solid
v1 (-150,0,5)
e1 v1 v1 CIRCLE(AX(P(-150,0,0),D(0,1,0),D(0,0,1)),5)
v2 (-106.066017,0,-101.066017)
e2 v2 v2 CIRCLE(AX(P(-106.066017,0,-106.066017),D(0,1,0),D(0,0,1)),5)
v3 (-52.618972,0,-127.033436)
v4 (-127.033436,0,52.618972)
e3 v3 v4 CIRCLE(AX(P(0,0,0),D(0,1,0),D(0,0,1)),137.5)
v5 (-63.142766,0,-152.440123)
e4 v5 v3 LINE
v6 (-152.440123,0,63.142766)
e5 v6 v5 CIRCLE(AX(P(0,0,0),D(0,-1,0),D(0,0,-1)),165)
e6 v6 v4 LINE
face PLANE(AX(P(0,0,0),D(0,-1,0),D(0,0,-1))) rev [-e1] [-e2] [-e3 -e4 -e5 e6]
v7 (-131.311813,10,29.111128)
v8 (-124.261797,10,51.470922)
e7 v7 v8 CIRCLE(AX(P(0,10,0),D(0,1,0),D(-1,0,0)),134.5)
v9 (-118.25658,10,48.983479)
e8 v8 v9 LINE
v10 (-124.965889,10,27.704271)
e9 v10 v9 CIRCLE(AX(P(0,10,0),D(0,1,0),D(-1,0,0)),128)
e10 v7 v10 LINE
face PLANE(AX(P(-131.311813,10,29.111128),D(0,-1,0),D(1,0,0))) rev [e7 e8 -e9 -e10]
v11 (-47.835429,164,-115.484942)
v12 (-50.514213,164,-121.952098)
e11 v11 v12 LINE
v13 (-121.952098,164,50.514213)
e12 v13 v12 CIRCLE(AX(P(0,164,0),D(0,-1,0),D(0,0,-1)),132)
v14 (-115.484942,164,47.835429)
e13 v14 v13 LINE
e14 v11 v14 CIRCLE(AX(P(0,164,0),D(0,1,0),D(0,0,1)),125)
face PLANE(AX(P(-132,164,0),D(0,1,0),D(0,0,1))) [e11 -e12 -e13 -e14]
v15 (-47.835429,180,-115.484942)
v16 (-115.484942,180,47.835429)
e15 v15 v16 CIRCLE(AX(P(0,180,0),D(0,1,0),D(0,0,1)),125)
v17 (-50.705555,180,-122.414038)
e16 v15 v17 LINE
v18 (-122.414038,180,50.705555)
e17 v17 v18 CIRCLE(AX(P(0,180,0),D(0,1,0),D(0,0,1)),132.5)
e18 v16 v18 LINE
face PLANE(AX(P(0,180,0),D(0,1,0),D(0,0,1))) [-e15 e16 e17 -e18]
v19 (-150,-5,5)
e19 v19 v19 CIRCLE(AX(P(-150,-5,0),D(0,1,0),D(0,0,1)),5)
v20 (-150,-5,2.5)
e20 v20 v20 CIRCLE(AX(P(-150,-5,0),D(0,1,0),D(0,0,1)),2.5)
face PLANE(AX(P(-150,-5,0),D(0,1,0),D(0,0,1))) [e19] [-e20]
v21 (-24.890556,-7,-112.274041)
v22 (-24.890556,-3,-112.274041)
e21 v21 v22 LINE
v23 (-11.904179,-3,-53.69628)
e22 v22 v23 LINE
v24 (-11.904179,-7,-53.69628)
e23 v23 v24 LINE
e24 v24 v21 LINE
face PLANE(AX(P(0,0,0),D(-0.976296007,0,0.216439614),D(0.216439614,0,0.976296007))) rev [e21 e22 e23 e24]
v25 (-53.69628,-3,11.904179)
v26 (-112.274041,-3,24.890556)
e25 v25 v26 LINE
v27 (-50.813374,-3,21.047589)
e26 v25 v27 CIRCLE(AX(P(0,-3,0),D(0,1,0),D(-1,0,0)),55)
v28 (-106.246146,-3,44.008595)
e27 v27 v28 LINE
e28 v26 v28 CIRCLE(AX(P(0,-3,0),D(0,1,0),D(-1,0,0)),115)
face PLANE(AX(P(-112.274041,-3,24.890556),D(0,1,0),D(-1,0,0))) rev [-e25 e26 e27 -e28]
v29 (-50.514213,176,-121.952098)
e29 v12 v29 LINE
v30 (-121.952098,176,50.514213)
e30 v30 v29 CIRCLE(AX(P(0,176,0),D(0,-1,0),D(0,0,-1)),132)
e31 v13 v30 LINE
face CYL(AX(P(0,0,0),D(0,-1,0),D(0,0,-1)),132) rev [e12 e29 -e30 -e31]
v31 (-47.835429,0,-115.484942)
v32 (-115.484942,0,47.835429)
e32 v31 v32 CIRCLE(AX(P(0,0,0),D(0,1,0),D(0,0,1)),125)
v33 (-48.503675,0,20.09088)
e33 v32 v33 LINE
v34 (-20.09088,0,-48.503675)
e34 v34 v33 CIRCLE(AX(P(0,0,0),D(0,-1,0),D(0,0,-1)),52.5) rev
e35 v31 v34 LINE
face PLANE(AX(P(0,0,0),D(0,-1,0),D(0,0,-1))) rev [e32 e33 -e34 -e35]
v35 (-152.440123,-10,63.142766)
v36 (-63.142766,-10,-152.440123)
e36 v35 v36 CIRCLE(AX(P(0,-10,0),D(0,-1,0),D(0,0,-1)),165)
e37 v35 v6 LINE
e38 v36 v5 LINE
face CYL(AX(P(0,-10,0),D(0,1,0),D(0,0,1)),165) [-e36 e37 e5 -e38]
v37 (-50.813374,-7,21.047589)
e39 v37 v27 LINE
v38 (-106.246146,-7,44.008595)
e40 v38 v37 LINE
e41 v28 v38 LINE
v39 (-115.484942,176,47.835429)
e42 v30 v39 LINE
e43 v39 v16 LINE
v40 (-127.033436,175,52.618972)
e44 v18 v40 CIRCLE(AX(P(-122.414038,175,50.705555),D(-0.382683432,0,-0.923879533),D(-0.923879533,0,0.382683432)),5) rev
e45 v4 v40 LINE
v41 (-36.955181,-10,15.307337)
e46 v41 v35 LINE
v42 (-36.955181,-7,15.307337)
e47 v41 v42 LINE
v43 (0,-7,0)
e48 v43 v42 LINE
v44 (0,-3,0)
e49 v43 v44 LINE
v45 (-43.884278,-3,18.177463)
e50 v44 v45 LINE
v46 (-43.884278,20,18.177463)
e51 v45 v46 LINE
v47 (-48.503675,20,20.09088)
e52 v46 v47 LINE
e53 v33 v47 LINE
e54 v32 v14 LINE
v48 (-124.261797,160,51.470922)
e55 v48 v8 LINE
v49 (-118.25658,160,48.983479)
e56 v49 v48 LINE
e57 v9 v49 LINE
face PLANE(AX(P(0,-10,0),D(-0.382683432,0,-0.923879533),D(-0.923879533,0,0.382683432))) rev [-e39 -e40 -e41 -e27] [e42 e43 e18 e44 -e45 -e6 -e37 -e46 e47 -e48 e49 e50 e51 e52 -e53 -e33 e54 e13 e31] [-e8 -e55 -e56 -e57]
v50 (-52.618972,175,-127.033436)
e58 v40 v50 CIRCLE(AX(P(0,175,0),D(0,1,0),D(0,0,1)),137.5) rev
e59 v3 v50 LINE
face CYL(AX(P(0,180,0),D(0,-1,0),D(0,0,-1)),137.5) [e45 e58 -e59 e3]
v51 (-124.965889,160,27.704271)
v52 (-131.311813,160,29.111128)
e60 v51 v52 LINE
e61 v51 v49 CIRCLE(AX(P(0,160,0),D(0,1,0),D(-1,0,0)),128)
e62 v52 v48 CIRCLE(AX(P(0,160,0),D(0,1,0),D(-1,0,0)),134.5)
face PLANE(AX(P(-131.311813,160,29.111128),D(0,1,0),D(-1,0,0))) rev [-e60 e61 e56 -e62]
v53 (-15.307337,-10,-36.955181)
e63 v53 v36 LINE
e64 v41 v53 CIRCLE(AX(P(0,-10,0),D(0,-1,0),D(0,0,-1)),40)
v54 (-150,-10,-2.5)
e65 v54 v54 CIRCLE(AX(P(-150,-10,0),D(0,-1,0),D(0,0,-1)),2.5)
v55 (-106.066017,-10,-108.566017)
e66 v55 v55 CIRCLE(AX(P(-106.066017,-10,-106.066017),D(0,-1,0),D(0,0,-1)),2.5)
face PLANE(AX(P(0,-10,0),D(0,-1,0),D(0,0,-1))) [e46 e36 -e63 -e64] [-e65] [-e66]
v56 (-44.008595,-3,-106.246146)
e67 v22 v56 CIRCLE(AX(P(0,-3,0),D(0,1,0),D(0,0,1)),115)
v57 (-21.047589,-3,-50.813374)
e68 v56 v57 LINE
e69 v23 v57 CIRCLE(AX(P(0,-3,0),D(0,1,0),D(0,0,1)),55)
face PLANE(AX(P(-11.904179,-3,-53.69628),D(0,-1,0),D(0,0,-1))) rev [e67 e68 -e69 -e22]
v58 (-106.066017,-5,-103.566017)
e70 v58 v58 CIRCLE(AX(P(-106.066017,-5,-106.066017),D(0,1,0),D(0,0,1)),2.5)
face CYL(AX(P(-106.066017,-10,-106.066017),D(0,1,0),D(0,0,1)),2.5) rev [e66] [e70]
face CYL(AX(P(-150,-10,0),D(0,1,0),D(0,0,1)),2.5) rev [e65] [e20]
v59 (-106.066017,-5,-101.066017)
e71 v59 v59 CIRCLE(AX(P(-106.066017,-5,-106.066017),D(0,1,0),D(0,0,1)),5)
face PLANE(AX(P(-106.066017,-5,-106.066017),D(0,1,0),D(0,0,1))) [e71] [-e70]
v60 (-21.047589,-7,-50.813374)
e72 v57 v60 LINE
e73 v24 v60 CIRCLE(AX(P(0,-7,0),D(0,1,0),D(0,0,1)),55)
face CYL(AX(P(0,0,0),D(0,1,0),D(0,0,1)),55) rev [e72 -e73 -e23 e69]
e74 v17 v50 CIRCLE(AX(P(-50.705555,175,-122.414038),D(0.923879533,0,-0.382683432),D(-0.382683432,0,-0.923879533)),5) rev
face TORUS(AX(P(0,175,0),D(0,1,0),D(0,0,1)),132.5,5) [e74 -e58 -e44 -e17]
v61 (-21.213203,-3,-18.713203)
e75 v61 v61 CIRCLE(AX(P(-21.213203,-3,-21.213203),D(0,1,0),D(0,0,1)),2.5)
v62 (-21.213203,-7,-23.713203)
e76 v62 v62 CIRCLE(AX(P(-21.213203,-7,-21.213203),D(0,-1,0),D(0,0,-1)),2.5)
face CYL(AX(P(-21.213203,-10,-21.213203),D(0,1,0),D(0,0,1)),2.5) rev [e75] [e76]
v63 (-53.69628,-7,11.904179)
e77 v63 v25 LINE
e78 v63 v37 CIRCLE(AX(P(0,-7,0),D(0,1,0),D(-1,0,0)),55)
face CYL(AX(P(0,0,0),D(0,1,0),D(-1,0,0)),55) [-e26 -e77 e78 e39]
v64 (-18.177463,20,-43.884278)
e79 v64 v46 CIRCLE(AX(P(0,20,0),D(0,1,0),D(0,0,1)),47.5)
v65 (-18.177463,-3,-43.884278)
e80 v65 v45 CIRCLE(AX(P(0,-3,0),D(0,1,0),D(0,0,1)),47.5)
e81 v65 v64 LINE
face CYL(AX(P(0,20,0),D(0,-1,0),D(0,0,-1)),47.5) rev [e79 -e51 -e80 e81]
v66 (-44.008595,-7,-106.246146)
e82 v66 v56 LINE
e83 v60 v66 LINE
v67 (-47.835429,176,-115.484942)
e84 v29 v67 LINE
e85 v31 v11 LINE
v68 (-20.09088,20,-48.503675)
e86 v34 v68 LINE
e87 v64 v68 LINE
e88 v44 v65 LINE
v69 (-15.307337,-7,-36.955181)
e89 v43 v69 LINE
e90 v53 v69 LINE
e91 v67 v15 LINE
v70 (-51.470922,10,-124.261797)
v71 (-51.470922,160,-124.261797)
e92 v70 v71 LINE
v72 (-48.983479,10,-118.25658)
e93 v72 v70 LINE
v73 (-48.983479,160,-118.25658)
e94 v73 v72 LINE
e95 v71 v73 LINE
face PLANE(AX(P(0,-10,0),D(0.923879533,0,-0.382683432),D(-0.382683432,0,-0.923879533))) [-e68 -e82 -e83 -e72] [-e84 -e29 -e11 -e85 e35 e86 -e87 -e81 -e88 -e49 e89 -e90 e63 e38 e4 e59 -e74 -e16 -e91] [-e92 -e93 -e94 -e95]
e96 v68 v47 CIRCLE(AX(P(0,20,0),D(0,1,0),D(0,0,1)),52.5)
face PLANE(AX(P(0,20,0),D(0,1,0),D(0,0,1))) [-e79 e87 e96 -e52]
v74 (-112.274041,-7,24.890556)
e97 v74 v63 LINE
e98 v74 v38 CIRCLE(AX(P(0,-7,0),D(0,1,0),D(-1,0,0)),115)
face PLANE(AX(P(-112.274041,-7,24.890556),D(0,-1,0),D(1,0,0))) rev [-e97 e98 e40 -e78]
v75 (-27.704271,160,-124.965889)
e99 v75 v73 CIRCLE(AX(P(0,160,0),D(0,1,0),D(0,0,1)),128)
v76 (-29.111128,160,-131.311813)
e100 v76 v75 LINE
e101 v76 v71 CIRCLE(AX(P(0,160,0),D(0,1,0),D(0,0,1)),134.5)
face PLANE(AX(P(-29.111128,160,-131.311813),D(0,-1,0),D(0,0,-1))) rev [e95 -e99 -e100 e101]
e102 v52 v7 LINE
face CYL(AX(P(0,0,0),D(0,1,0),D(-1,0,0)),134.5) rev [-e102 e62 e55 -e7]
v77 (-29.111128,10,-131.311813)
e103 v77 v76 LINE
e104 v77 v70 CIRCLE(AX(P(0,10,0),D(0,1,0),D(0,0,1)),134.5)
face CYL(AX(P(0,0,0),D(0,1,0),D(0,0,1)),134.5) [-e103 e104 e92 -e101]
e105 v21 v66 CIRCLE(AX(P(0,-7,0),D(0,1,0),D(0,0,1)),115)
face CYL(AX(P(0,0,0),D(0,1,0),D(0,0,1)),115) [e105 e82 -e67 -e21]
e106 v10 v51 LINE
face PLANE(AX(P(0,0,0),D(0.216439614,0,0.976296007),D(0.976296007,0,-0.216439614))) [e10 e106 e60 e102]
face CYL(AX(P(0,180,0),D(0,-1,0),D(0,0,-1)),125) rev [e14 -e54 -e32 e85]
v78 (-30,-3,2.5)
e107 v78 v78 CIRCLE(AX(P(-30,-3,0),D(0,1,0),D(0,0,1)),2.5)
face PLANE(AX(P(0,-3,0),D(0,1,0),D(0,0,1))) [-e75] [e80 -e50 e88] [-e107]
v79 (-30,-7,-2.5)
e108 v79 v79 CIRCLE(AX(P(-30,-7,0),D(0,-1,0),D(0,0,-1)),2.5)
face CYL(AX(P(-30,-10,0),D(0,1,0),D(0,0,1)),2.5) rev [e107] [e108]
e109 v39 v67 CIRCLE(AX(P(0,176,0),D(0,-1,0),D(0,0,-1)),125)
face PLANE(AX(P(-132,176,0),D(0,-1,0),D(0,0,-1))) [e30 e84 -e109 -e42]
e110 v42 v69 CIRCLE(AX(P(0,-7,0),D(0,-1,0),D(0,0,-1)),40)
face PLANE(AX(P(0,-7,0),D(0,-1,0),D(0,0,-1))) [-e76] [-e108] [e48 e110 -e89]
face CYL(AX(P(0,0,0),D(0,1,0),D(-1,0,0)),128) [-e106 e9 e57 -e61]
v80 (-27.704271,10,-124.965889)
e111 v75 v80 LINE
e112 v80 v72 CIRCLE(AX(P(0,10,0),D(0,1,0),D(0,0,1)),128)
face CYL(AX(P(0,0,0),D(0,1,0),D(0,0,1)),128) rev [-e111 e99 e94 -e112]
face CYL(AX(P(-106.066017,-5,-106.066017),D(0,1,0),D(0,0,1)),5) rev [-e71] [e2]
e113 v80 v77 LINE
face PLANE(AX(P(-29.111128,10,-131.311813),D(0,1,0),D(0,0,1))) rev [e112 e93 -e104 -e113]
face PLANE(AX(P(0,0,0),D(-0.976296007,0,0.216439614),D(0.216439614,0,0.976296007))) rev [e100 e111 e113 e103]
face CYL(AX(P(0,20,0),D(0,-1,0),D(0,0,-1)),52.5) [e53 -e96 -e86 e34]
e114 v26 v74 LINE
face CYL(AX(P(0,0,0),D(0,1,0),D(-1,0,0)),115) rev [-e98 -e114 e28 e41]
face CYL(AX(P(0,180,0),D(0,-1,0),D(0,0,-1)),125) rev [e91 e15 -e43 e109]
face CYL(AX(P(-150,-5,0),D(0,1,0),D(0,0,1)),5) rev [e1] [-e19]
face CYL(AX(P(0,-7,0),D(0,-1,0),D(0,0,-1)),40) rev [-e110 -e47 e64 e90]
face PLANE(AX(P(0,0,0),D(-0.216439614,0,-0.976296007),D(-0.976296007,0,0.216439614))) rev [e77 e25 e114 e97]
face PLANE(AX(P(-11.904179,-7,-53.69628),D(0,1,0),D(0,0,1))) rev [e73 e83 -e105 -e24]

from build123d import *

# Parameters (mm, degrees)
SKETCH1_R           = 137.5
SKETCH1_R_2         = 125
BOSS_EXTRUDE1_DEPTH = 180
SKETCH2_R           = 165
SKETCH2_R_2         = 2.5
BOSS_EXTRUDE2_DEPTH = 10
SKETCH3_R           = 52.5
SKETCH3_R_2         = 47.5
BOSS_EXTRUDE3_DEPTH = 20
SKETCH4_W           = 56
SKETCH4_H           = 96
CUT_EXTRUDE4_DEPTH  = 150
SKETCH5_W           = 56
SKETCH5_H           = 10
BOSS_EXTRUDE4_DEPTH = 56
SKETCH6_W           = 56
SKETCH6_H           = 56
BOSS_EXTRUDE5_DEPTH = 10
SKETCH7_R           = 2.5
SKETCH7_R_2         = 12.5
CUT_EXTRUDE5_DEPTH  = 10
SKETCH8_W           = 56
SKETCH8_H           = 86
BOSS_EXTRUDE6_DEPTH = 5
FILLET1_R           = 10
FILLET2_R           = 5
SKETCH9_W           = 31.730677801
SKETCH9_H           = 6
CUT_EXTRUDE6_DEPTH  = 10
FILLET3_R           = 5
CUT_EXTRUDE7_START  = -3
SKETCH10_R          = 47.5
CUT_EXTRUDE7_DEPTH  = 3
SKETCH11_R          = 5
CUT_EXTRUDE8_DEPTH  = 5
SKETCH13_W          = 14
SKETCH13_H          = 12
CUT_EXTRUDE9_DEPTH  = 301.915270467
SKETCH15_W          = 6.5
SKETCH15_H          = 150
SKETCH15_W_2        = 60
SKETCH15_H_2        = 4
REVOLVE1_ANGLE      = 10
SKETCH16_W          = 6.5
SKETCH16_H          = 150
SKETCH16_W_2        = 60
SKETCH16_H_2        = 4
CUT_REVOLVE2_ANGLE  = 10
SKETCH17_R          = 40
CUT_EXTRUDE10_DEPTH = 3


with BuildPart() as part:
    # Sketch1 → Boss-Extrude1 (new body)
    with BuildSketch(Plane(origin=(0, 0, 0), x_dir=(1, 0, 0), z_dir=(0, 1, 0))):
        with Locations(Location((0, 0, 0), (0, 0, 90))):
            Circle(SKETCH1_R)
        with Locations(Location((0, 0, 0), (0, 0, 90))):
            Circle(SKETCH1_R_2, mode=Mode.SUBTRACT)
    extrude(amount=BOSS_EXTRUDE1_DEPTH)

    # Sketch2 → Boss-Extrude2 (add)
    with BuildSketch(Plane.XZ):
        with Locations(Location((0, 0, 0), (0, 0, 270))):
            Circle(SKETCH2_R)
        with Locations(Location((0, 150, 0), (0, 0, 270))):
            Circle(SKETCH2_R_2, mode=Mode.SUBTRACT)
        with Locations(Location((0, 30, 0), (0, 0, 270))):
            Circle(SKETCH2_R_2, mode=Mode.SUBTRACT)
        with Locations(Location((106.066017178, 106.066017178, 0), (0, 0, 270))):
            Circle(SKETCH2_R_2, mode=Mode.SUBTRACT)
        with Locations(Location((150, 0, 0), (0, 0, 270))):
            Circle(SKETCH2_R_2, mode=Mode.SUBTRACT)
        with Locations(Location((106.066017178, -106.066017178, 0), (0, 0, 270))):
            Circle(SKETCH2_R_2, mode=Mode.SUBTRACT)
        with Locations(Location((0, -150, 0), (0, 0, 270))):
            Circle(SKETCH2_R_2, mode=Mode.SUBTRACT)
        with Locations(Location((-106.066017178, -106.066017178, 0), (0, 0, 270))):
            Circle(SKETCH2_R_2, mode=Mode.SUBTRACT)
        with Locations(Location((-150, 0, 0), (0, 0, 270))):
            Circle(SKETCH2_R_2, mode=Mode.SUBTRACT)
        with Locations(Location((-106.066017178, 106.066017178, 0), (0, 0, 270))):
            Circle(SKETCH2_R_2, mode=Mode.SUBTRACT)
        with Locations(Location((21.213203436, 21.213203436, 0), (0, 0, 270))):
            Circle(SKETCH2_R_2, mode=Mode.SUBTRACT)
        with Locations(Location((30, 0, 0), (0, 0, 270))):
            Circle(SKETCH2_R_2, mode=Mode.SUBTRACT)
        with Locations(Location((21.213203436, -21.213203436, 0), (0, 0, 270))):
            Circle(SKETCH2_R_2, mode=Mode.SUBTRACT)
        with Locations(Location((0, -30, 0), (0, 0, 270))):
            Circle(SKETCH2_R_2, mode=Mode.SUBTRACT)
        with Locations(Location((-21.213203436, -21.213203436, 0), (0, 0, 270))):
            Circle(SKETCH2_R_2, mode=Mode.SUBTRACT)
        with Locations(Location((-30, 0, 0), (0, 0, 270))):
            Circle(SKETCH2_R_2, mode=Mode.SUBTRACT)
        with Locations(Location((-21.213203436, 21.213203436, 0), (0, 0, 270))):
            Circle(SKETCH2_R_2, mode=Mode.SUBTRACT)
    extrude(amount=BOSS_EXTRUDE2_DEPTH)

    # Sketch3 → Boss-Extrude3 (add)
    with BuildSketch(Plane(origin=(0, 0, 0), x_dir=(1, 0, 0), z_dir=(0, 1, 0))):
        with Locations(Location((0, 0, 0), (0, 0, 90))):
            Circle(SKETCH3_R)
        with Locations(Location((0, 0, 0), (0, 0, 270))):
            Circle(SKETCH3_R_2, mode=Mode.SUBTRACT)
    extrude(amount=BOSS_EXTRUDE3_DEPTH)

    # Sketch4 → Cut-Extrude4 (cut)
    with BuildSketch(Plane(origin=(0, 0, 0), x_dir=(0, 0, -1), z_dir=(1, 0, 0))):
        with Locations((0, 112)):
            Rectangle(SKETCH4_W, SKETCH4_H)
    extrude(amount=CUT_EXTRUDE4_DEPTH, mode=Mode.SUBTRACT)

    # Sketch5 → Boss-Extrude4 (add)
    with BuildSketch(Plane(origin=(0, 0, 28), x_dir=(-1, 0, 0), z_dir=(0, 0, -1))):
        with Locations((-121.823643025, 135)):
            Rectangle(SKETCH5_W, SKETCH5_H)
    extrude(amount=BOSS_EXTRUDE4_DEPTH)

    # Sketch6 → Boss-Extrude5 (add)
    with BuildSketch(Plane(origin=(0, 64, 0), x_dir=(1, 0, 0), z_dir=(0, 1, 0))):
        with Locations((121.823643025, 0)):
            Rectangle(SKETCH6_W, SKETCH6_H)
    extrude(amount=-BOSS_EXTRUDE5_DEPTH)

    # Sketch7 → Cut-Extrude5 (cut)
    with BuildSketch(Plane(origin=(0, 140, 0), x_dir=(1, 0, 0), z_dir=(0, 1, 0))):
        with Locations(Location((98.273643025, 23.55, 0), (0, 0, 270))):
            Circle(SKETCH7_R)
        with Locations(Location((145.373643025, 23.55, 0), (0, 0, 270))):
            Circle(SKETCH7_R)
        with Locations(Location((98.273643025, -23.55, 0), (0, 0, 270))):
            Circle(SKETCH7_R)
        with Locations(Location((145.373643025, -23.55, 0), (0, 0, 270))):
            Circle(SKETCH7_R)
        with Locations(Location((121.823643025, 0, 0), (0, 0, 270))):
            Circle(SKETCH7_R_2)
    extrude(amount=-CUT_EXTRUDE5_DEPTH, mode=Mode.SUBTRACT)

    # Sketch8 → Boss-Extrude6 (add)
    with BuildSketch(Plane(origin=(149.823643025, 0, 0), x_dir=(0, 0, -1), z_dir=(1, 0, 0))):
        with Locations((0, 97)):
            Rectangle(SKETCH8_W, SKETCH8_H)
    extrude(amount=BOSS_EXTRUDE6_DEPTH)

    # Fillet1
    # the kernel refuses this fillet: 10 mm, written as the material it takes off along each edge
    with BuildSketch(Plane(origin=(154.823643025, 165, -28), x_dir=(0, 0, 1), z_dir=(0, -1, 0))) as fillet1_piece_1:
        with BuildLine():
            CenterArc((FILLET1_R, FILLET1_R), FILLET1_R, 180, 90)
            Line((0, FILLET1_R), (0, 0))
            Line((0, 0), (FILLET1_R, 0))
        make_face()
    extrude(amount=136, mode=Mode.SUBTRACT)
    with BuildSketch(Plane(origin=(154.823643025, 29, 28), x_dir=(-1, 0, 0), z_dir=(0, 1, 0))) as fillet1_piece_2:
        with BuildLine():
            CenterArc((FILLET1_R, -FILLET1_R), FILLET1_R, 90, 90)
            Line((0, -FILLET1_R), (0, 0))
            Line((0, 0), (FILLET1_R, 0))
        make_face()
    extrude(amount=136, mode=Mode.SUBTRACT)

    # Fillet2
    fillet2_edges = [part.edges().sort_by_distance(p)[0] for p in [
        (93.823643025, 59, 28),
        (93.823643025, 59, -28),
        (93.823643025, 135, -28),
        (93.823643025, 135, 28),
    ]]
    fillet(fillet2_edges, radius=FILLET2_R)

    # Sketch9 → Cut-Extrude6 (cut)
    with BuildSketch(Plane(origin=(0, 140, 0), x_dir=(1, 0, 0), z_dir=(0, 1, 0))):
        with Locations((93.823643026, 0)):
            Rectangle(SKETCH9_W, SKETCH9_H)
    extrude(amount=-CUT_EXTRUDE6_DEPTH, mode=Mode.SUBTRACT)

    # Fillet3
    fillet3_edges = [part.edges().sort_by_distance(p)[0] for p in [
        (0, 180, 137.5),
    ]]
    fillet(fillet3_edges, radius=FILLET3_R)

    # Sketch10 → Cut-Extrude7 (cut)
    with BuildSketch(Plane(origin=(0, 0, 0), x_dir=(1, 0, 0), z_dir=(0, 1, 0)).offset(CUT_EXTRUDE7_START)):
        with Locations(Location((0, 0, 0), (0, 0, 270))):
            Circle(SKETCH10_R)
    extrude(amount=CUT_EXTRUDE7_DEPTH, mode=Mode.SUBTRACT)

    # Sketch11 → Cut-Extrude8 (cut)
    with BuildSketch(Plane(origin=(0, 0, 0), x_dir=(1, 0, 0), z_dir=(0, 1, 0))):
        with Locations(Location((0, 150, 0), (0, 0, 270))):
            Circle(SKETCH11_R)
        with Locations(Location((106.066017178, 106.066017178, 0), (0, 0, 270))):
            Circle(SKETCH11_R)
        with Locations(Location((150, 0, 0), (0, 0, 270))):
            Circle(SKETCH11_R)
        with Locations(Location((106.066017178, -106.066017178, 0), (0, 0, 270))):
            Circle(SKETCH11_R)
        with Locations(Location((0, -150, 0), (0, 0, 270))):
            Circle(SKETCH11_R)
        with Locations(Location((-106.066017178, -106.066017178, 0), (0, 0, 270))):
            Circle(SKETCH11_R)
        with Locations(Location((-150, 0, 0), (0, 0, 270))):
            Circle(SKETCH11_R)
        with Locations(Location((-106.066017178, 106.066017178, 0), (0, 0, 270))):
            Circle(SKETCH11_R)
    extrude(amount=-CUT_EXTRUDE8_DEPTH, mode=Mode.SUBTRACT)

    # Sketch13 → Cut-Revolve1 (revolve, cut)
    with BuildSketch(Plane.XY, mode=Mode.PRIVATE) as cut_revolve1_sk:
        with Locations((-125, 170)):
            Rectangle(SKETCH13_W, SKETCH13_H)
    revolve(cut_revolve1_sk.sketch.rotate(Axis((0, 0, 0), (0, 1, 0)), 90), axis=Axis((0, 0, 0), (0, 1, 0)), mode=Mode.SUBTRACT)

    # Sketch14 → Cut-Extrude9 (cut, through all)
    with BuildSketch(Plane(origin=(0, 180, 0), x_dir=(1, 0, 0), z_dir=(0, 1, 0))):
        with BuildLine():
            Line((-47.835429046, 115.484941564), (0, 0))
            Line((0, 0), (115.484941564, 47.835429046))
            ThreePointArc((115.484941564, 47.835429046), (47.835429046, 115.484941564), (-47.835429046, 115.484941564))
        make_face()
        with BuildLine():
            ThreePointArc((-47.835429046, 115.484941564), (47.835429046, 115.484941564), (115.484941564, 47.835429046))
            Line((115.484941564, 47.835429046), (122.414038058, 50.705554788))
            ThreePointArc((122.414038058, 50.705554788), (50.705554788, 122.414038058), (-50.705554788, 122.414038058))
            Line((-50.705554788, 122.414038058), (-47.835429046, 115.484941564))
        make_face()
        with BuildLine():
            ThreePointArc((-50.705554788, 122.414038058), (50.705554788, 122.414038058), (122.414038058, 50.705554788))
            Line((122.414038058, 50.705554788), (152.440122864, 63.14276634))
            ThreePointArc((152.440122864, 63.14276634), (63.14276634, 152.440122864), (-63.14276634, 152.440122864))
            Line((-63.14276634, 152.440122864), (-50.705554788, 122.414038058))
        make_face()
        with BuildLine():
            Line((152.440122864, 63.14276634), (122.414038058, 50.705554788))
            ThreePointArc((122.414038058, 50.705554788), (129.954049653, 25.849467667), (132.5, 0))
            Line((132.5, 0), (165, 0))
            ThreePointArc((165, 0), (161.829571267, 32.189903133), (152.440122864, 63.14276634))
        make_face()
        with BuildLine():
            Line((115.484941564, 47.835429046), (0, 0))
            Line((0, 0), (125, 0))
            ThreePointArc((125, 0), (122.59816005, 24.386290252), (115.484941564, 47.835429046))
        make_face()
        with BuildLine():
            Line((122.414038058, 50.705554788), (115.484941564, 47.835429046))
            ThreePointArc((115.484941564, 47.835429046), (122.59816005, 24.386290252), (125, 0))
            Line((125, 0), (132.5, 0))
            ThreePointArc((132.5, 0), (129.954049653, 25.849467667), (122.414038058, 50.705554788))
        make_face()
        with BuildLine():
            ThreePointArc((132.5, 0), (110.16972363, -73.613055875), (50.705554788, -122.414038058))
            Line((50.705554788, -122.414038058), (63.14276634, -152.440122864))
            ThreePointArc((63.14276634, -152.440122864), (137.19248603, -91.669088448), (165, 0))
            Line((165, 0), (132.5, 0))
        make_face()
        with BuildLine():
            ThreePointArc((125, 0), (103.933701538, -69.446279127), (47.835429046, -115.484941564))
            Line((47.835429046, -115.484941564), (50.705554788, -122.414038058))
            ThreePointArc((50.705554788, -122.414038058), (110.16972363, -73.613055875), (132.5, 0))
            Line((132.5, 0), (125, 0))
        make_face()
        with BuildLine():
            Line((125, 0), (0, 0))
            Line((0, 0), (47.835429046, -115.484941564))
            ThreePointArc((47.835429046, -115.484941564), (103.933701538, -69.446279127), (125, 0))
        make_face()
        with BuildLine():
            ThreePointArc((50.705554788, -122.414038058), (-50.705554788, -122.414038058), (-122.414038058, -50.705554788))
            Line((-122.414038058, -50.705554788), (-152.440122864, -63.14276634))
            ThreePointArc((-152.440122864, -63.14276634), (-63.14276634, -152.440122864), (63.14276634, -152.440122864))
            Line((63.14276634, -152.440122864), (50.705554788, -122.414038058))
        make_face()
        with BuildLine():
            ThreePointArc((47.835429046, -115.484941564), (-47.835429046, -115.484941564), (-115.484941564, -47.835429046))
            Line((-115.484941564, -47.835429046), (-122.414038058, -50.705554788))
            ThreePointArc((-122.414038058, -50.705554788), (-50.705554788, -122.414038058), (50.705554788, -122.414038058))
            Line((50.705554788, -122.414038058), (47.835429046, -115.484941564))
        make_face()
        with BuildLine():
            Line((47.835429046, -115.484941564), (0, 0))
            Line((0, 0), (-115.484941564, -47.835429046))
            ThreePointArc((-115.484941564, -47.835429046), (-47.835429046, -115.484941564), (47.835429046, -115.484941564))
        make_face()
    extrude(amount=-CUT_EXTRUDE9_DEPTH, mode=Mode.SUBTRACT)

    # Sketch15 → Revolve1 (revolve)
    with BuildSketch(Plane(origin=(0, 0, 0), x_dir=(-0.38268343236509034, 0, -0.9238795325112865), z_dir=(0.9238795325112865, 0, -0.38268343236509034))):
        with Locations((131.25, 85)):
            Rectangle(SKETCH15_W, SKETCH15_H)
        with Locations((85, -5)):
            Rectangle(SKETCH15_W_2, SKETCH15_H_2)
    revolve(axis=Axis((0, 0, 0), (0, -1, 0)), revolution_arc=REVOLVE1_ANGLE)

    # Sketch16 → Cut-Revolve2 (revolve, cut)
    with BuildSketch(Plane(origin=(0, 0, 0), x_dir=(0.9238795325112864, 0, -0.3826834323650908), z_dir=(0.3826834323650908, 0, 0.9238795325112864))):
        with Locations((-131.25, 85)):
            Rectangle(SKETCH16_W, SKETCH16_H)
        with Locations((-85, -5)):
            Rectangle(SKETCH16_W_2, SKETCH16_H_2)
    revolve(axis=Axis((0, 0, 0), (0, -1, 0)), revolution_arc=CUT_REVOLVE2_ANGLE, mode=Mode.SUBTRACT)

    # Sketch17 → Cut-Extrude10 (cut)
    with BuildSketch(Plane.XZ.offset(10)):
        Circle(SKETCH17_R)
    extrude(amount=-CUT_EXTRUDE10_DEPTH, mode=Mode.SUBTRACT)


solid = part.part
